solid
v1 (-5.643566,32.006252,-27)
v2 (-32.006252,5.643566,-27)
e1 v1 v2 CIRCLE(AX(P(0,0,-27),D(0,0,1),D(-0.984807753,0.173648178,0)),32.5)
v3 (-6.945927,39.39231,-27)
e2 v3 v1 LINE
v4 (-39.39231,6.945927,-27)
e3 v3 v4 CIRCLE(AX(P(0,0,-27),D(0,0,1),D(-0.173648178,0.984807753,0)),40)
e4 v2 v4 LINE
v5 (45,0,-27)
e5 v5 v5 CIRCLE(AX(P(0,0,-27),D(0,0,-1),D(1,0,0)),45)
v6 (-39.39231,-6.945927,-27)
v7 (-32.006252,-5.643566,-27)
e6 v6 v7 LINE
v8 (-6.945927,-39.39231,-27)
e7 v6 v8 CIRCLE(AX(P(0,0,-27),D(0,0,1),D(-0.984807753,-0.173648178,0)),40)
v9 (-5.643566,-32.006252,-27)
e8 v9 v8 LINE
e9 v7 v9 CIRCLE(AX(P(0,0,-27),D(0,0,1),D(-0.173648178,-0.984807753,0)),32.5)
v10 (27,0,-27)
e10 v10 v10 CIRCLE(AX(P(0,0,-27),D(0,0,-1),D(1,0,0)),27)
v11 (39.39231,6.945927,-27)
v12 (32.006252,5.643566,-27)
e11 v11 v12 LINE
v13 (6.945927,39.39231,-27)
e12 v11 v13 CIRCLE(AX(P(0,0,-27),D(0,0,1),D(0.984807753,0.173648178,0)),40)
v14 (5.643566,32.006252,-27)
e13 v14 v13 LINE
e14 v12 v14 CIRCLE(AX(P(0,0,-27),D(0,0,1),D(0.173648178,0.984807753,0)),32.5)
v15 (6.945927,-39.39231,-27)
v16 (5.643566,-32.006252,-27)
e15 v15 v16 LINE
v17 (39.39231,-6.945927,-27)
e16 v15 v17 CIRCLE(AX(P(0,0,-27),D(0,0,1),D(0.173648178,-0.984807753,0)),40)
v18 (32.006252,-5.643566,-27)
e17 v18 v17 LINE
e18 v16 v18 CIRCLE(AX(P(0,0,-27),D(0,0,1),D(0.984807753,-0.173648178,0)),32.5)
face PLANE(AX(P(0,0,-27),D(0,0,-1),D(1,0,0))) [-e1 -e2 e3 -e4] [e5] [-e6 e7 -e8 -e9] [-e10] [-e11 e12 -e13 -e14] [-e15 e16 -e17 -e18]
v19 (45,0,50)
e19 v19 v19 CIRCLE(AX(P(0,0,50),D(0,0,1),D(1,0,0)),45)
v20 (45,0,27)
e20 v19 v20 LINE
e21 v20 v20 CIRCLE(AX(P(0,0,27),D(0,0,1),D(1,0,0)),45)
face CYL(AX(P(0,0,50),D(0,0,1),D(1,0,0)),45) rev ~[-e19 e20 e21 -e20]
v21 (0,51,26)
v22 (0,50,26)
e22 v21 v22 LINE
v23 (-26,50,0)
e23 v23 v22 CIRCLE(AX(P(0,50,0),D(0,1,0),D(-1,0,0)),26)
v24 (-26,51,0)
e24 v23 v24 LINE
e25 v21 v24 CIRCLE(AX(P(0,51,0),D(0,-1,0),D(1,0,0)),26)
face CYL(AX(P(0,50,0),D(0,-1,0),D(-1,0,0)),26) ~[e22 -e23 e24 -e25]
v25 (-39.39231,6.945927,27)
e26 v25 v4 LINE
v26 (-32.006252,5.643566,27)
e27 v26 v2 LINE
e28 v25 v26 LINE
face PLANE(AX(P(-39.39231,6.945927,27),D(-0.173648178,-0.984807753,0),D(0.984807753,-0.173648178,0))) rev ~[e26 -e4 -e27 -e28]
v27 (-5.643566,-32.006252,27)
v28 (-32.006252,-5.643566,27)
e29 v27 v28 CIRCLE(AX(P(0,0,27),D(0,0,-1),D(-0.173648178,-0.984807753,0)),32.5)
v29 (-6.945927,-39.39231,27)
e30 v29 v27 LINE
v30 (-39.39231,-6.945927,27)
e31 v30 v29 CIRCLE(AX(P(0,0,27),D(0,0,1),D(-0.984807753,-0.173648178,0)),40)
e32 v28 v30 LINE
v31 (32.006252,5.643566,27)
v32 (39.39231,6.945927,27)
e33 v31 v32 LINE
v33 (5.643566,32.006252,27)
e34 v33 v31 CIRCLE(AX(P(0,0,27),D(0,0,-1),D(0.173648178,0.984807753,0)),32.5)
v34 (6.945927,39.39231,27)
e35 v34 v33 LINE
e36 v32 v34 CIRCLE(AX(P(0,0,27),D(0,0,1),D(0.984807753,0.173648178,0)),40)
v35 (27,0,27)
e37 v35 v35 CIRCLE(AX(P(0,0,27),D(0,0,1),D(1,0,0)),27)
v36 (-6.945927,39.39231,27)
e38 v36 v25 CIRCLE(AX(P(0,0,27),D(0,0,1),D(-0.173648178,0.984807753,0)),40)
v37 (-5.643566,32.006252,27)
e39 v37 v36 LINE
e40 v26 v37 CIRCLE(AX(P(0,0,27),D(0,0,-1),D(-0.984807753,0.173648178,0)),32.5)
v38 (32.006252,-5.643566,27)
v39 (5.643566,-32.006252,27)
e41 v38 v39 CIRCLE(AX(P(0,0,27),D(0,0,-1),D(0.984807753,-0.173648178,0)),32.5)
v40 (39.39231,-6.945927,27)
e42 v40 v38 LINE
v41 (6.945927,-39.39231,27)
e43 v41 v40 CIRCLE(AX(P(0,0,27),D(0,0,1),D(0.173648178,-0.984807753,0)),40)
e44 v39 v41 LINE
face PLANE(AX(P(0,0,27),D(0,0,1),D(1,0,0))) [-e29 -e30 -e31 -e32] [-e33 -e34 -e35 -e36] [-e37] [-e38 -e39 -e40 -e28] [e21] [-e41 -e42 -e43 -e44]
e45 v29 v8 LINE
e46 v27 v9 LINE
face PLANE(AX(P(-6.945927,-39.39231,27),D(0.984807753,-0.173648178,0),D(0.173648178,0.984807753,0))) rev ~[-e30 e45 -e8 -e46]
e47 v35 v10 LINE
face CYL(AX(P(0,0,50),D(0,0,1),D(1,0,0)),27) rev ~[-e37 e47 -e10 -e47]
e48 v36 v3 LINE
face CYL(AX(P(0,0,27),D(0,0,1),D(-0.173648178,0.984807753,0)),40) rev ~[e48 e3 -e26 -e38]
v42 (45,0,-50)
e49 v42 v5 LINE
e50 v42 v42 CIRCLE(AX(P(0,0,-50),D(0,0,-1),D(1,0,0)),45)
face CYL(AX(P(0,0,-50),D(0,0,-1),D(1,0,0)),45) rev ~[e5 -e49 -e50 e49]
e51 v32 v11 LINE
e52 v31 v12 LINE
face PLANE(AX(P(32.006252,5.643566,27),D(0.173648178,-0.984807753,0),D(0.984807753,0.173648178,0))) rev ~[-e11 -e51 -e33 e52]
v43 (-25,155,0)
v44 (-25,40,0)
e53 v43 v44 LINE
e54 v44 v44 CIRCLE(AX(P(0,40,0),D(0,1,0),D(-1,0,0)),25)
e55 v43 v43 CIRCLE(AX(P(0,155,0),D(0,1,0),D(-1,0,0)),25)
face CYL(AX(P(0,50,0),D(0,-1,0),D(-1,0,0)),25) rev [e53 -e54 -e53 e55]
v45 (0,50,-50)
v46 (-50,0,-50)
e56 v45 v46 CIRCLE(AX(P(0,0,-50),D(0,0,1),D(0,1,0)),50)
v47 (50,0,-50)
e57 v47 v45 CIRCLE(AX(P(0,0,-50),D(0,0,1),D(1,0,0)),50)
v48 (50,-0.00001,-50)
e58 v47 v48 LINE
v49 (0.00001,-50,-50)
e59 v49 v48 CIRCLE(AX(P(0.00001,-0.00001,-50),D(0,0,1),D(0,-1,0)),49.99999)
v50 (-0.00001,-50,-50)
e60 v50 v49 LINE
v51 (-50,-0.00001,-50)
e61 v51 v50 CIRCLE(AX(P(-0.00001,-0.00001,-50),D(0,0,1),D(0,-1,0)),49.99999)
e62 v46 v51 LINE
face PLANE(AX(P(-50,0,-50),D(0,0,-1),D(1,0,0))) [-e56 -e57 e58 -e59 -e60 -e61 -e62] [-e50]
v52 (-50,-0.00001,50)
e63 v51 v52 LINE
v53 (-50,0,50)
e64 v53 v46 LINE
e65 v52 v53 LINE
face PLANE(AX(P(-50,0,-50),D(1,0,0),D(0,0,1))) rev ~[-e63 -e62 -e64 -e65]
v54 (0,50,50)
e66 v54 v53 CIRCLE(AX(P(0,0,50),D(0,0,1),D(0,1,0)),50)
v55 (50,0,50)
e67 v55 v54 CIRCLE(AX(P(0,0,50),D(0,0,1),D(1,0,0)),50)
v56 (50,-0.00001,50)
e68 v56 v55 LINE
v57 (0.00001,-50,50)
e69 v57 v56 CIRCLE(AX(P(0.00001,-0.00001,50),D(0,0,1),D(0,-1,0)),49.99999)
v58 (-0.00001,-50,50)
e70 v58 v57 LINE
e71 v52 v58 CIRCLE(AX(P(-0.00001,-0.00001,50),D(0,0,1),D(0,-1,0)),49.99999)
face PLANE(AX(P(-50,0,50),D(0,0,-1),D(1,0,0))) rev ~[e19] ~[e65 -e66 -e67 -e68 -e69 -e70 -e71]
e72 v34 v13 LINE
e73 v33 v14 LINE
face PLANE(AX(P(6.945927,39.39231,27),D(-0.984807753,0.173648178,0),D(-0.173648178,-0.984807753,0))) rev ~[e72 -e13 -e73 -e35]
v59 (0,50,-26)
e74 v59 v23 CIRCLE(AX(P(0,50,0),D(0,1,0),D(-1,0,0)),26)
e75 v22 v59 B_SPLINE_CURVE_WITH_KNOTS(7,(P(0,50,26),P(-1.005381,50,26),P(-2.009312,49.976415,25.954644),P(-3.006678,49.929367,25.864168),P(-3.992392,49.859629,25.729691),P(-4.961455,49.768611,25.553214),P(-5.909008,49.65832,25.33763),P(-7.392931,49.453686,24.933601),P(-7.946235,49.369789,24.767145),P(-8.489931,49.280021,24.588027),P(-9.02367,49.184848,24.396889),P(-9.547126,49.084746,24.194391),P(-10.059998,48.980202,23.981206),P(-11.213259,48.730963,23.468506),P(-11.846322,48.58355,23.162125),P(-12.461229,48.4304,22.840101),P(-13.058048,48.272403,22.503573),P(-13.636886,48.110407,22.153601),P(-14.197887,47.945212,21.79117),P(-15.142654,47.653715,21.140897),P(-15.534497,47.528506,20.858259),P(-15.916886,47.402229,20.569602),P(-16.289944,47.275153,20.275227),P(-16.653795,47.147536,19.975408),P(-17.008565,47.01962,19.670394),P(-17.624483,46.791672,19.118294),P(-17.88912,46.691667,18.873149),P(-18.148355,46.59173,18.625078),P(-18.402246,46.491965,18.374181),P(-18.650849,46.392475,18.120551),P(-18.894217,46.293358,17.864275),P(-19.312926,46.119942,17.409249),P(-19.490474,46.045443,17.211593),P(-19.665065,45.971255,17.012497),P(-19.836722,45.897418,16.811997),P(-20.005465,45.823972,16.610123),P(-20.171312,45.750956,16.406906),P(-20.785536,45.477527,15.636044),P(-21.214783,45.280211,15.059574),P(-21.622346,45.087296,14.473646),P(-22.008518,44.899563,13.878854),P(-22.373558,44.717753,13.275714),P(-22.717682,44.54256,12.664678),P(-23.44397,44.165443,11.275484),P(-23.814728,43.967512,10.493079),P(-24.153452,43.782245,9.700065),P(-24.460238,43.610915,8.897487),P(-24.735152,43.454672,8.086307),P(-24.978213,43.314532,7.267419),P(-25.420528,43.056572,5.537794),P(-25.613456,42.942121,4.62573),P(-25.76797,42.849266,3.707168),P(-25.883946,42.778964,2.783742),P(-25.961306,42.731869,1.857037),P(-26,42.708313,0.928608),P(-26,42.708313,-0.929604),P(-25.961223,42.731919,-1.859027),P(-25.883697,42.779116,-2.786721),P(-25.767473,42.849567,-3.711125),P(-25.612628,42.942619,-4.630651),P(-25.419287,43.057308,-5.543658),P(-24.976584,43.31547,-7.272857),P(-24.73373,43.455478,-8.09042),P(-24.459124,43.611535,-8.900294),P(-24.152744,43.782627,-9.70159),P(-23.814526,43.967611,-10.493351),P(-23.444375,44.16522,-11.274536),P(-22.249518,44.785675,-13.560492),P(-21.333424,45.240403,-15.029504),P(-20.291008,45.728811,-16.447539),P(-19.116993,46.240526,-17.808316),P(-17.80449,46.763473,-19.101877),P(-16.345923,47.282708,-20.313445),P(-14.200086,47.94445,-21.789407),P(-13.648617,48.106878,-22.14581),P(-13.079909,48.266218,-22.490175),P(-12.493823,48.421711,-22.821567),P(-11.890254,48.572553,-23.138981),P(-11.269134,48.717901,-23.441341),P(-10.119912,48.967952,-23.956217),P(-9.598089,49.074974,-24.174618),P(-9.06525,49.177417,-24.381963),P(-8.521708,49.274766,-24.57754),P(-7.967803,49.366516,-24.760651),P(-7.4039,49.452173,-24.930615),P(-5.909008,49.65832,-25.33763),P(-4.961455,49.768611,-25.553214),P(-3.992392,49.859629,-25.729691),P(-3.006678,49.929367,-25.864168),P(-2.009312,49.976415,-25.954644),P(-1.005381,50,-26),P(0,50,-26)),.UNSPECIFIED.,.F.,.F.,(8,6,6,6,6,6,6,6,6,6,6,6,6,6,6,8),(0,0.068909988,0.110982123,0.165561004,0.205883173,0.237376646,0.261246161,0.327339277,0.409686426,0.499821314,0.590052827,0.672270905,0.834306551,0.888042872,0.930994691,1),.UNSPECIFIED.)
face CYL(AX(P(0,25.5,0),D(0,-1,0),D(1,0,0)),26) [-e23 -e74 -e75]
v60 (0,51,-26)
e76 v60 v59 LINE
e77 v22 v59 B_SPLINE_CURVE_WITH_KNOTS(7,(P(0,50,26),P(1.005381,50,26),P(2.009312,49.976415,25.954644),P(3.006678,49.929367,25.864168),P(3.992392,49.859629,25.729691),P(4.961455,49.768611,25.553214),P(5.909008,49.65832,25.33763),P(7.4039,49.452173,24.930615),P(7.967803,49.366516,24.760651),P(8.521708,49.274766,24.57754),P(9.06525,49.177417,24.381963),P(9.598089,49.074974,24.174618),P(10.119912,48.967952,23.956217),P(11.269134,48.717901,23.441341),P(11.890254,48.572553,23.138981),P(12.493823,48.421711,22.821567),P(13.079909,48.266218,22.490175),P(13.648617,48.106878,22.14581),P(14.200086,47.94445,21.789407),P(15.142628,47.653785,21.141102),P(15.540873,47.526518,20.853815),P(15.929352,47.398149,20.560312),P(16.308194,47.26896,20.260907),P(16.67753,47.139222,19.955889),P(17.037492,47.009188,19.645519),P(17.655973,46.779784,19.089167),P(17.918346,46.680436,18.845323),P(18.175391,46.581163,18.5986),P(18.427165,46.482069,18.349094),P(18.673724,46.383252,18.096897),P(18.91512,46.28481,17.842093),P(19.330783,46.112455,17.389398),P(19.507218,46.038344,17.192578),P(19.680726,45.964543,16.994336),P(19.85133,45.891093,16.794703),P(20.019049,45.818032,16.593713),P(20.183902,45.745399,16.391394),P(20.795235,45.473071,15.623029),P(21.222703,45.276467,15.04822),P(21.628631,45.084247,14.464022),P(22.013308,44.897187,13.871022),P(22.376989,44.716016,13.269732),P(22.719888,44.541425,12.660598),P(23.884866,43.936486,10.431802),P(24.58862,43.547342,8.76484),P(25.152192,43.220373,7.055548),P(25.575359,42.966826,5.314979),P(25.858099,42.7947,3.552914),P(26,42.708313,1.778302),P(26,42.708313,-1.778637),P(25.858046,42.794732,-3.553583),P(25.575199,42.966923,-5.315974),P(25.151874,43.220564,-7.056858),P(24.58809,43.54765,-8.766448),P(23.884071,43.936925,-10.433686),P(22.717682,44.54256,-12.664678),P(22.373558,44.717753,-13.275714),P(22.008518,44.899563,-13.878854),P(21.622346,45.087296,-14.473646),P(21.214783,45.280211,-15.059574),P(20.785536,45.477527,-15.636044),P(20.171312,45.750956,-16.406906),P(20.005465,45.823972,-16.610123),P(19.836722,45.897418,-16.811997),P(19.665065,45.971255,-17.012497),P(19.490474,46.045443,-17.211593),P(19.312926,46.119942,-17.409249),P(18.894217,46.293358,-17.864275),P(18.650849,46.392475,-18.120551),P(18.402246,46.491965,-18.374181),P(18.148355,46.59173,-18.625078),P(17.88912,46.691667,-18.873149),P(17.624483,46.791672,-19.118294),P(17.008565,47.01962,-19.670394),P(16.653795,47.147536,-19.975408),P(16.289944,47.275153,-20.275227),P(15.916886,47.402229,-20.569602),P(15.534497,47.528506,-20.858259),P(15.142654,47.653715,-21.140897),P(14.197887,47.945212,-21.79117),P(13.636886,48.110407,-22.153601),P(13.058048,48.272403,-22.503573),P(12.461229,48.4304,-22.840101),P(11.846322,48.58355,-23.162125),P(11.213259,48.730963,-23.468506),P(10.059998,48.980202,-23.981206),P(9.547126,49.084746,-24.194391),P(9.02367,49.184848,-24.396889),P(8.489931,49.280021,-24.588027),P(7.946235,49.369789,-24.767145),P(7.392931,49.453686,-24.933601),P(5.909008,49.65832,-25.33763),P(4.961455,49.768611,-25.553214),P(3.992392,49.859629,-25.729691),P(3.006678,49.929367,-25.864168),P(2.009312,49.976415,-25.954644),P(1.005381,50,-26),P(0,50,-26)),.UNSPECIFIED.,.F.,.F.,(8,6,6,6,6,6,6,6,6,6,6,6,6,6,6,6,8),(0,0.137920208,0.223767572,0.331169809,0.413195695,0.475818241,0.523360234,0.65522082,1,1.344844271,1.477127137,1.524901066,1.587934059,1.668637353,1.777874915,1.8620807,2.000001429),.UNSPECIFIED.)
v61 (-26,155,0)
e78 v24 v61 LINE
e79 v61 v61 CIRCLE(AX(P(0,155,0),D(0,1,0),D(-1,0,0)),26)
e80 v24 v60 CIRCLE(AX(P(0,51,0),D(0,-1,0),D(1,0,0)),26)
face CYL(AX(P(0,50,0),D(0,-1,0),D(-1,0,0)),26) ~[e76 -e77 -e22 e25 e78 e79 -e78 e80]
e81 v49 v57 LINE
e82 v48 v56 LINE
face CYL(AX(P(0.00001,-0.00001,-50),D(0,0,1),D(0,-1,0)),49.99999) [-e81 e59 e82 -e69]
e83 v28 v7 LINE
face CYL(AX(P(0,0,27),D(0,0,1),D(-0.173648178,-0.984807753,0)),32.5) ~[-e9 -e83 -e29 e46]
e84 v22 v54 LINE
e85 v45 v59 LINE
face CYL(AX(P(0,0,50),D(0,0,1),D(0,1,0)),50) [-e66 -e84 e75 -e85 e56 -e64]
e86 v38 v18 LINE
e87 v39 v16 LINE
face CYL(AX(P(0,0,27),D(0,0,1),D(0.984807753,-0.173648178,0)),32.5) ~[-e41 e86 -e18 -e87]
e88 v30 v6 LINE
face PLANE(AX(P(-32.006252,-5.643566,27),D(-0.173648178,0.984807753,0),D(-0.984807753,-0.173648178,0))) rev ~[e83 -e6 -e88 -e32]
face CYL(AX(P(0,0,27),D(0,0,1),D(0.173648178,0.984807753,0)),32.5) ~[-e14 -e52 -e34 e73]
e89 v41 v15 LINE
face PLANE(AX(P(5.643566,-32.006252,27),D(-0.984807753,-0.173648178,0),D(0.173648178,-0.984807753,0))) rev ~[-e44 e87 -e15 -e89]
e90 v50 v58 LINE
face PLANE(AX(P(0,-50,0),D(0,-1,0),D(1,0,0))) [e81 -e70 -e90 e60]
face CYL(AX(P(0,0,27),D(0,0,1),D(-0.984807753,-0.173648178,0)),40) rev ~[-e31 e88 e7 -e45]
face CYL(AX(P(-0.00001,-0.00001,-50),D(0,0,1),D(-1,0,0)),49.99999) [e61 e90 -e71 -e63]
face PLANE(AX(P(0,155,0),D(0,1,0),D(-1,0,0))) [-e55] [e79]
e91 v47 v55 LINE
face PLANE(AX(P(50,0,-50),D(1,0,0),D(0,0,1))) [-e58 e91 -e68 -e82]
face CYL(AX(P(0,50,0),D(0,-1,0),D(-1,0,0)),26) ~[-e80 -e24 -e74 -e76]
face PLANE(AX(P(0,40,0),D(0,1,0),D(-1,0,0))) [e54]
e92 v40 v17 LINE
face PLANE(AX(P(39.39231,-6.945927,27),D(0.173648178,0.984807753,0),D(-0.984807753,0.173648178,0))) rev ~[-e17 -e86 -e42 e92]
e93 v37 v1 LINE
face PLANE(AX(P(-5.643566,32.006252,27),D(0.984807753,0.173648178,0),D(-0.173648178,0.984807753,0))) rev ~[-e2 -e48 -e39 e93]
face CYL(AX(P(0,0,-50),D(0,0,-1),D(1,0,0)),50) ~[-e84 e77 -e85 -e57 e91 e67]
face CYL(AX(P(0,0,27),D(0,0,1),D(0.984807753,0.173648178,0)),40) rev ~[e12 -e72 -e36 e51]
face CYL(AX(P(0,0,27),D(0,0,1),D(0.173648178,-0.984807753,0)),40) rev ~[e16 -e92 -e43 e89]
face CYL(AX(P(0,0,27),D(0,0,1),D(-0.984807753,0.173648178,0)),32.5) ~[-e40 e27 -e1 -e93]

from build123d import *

# Parameters (mm, degrees)
F0_W          = 100
F0_H          = 100
F1_DEPTH      = 50
F2_R          = 27
F3_DEPTH      = 100.001
F4_R          = 45
F5_DEPTH      = 23
F6_R          = 45
F6_R_2        = 27
F7_DEPTH      = 23
F8_R          = 49.99999
F9_R          = 25
F10_DEPTH     = 10
F11_R         = 26
F11_R_2       = 25
F12_DEPTH     = 105
F13_T4_DEPTH  = 100
F13_S5_R      = 26
F13_T6_DEPTH  = 63
F13_T10_DEPTH = 100
F13_S11_R     = 26
F13_T12_DEPTH = 63
F15_DEPTH     = 77.0010001


# Not quite as in the source:
# - a fillet or chamfer that OpenCascade refuses, or shapes differently, is made with other operations: its cross-section is extruded or revolved along the edge and cut away or added
# - a fillet or chamfer is up to 0.001 mm smaller than in the source, because OpenCascade refuses the exact size


with BuildPart() as f1:
    # F0 (on Front) → F1 (new body, symmetric)
    with BuildSketch(Plane.XZ):
        Rectangle(F0_W, F0_H)
    extrude(amount=F1_DEPTH, both=True)

    # F2 (on face) → F3 (cut, through all)
    with BuildSketch(Plane.XY.offset(50)):
        Circle(F2_R)
    extrude(amount=-F3_DEPTH, mode=Mode.SUBTRACT)

    # F4 (on face) → F5 (cut)
    with BuildSketch(Plane.XY.offset(50)):
        Circle(F4_R)
    extrude(amount=-F5_DEPTH, mode=Mode.SUBTRACT)

    # F6 (on face) → F7 (cut)
    with BuildSketch(Plane(origin=(0, 0, -50), x_dir=(1, 0, 0), z_dir=(0, 0, -1))):
        Circle(F6_R)
        Circle(F6_R_2, mode=Mode.SUBTRACT)
    extrude(amount=-F7_DEPTH, mode=Mode.SUBTRACT)

    # F8 (radius 50 in the source; OpenCascade refuses exactly that, so slightly less here)
    f8_edges = [f1.edges().sort_by_distance(p)[0] for p in [
        (50, -50, 0),
        (-50, -50, 0),
    ]]
    fillet(f8_edges, radius=F8_R)

    # F9 (on face) → F10 (cut)
    with BuildSketch(Plane(origin=(0, 50, 0), x_dir=(-1, 0, 0), z_dir=(0, 1, 0))):
        Circle(F9_R)
    extrude(amount=-F10_DEPTH, mode=Mode.SUBTRACT)

    # F11 (on face) → F12 (join)
    with BuildSketch(Plane(origin=(0, 50, 0), x_dir=(-1, 0, 0), z_dir=(0, 1, 0))):
        Circle(F11_R)
        Circle(F11_R_2, mode=Mode.SUBTRACT)
    extrude(amount=F12_DEPTH)

    # F13: fillet of radius 50 on 2 edges, made by hand


with BuildPart() as f13_tool2:
    # F13_s3 → F13_t4 (new body)
    with BuildSketch(Plane.XY.offset(-50)):
        with BuildLine():
            ThreePointArc((50, 0), (35.3553390593, 35.3553390593), (0, 50))
            Line((0, 50), (0, 51))
            Line((0, 51), (51, 51))
            Line((51, 51), (51, 0))
            Line((51, 0), (50, 0))
        make_face()
    extrude(amount=F13_T4_DEPTH)

    # F13_s5 → F13_t6 (cut, symmetric)
    with BuildSketch(Plane.XZ.offset(-25.5)):
        Circle(F13_S5_R)
    extrude(amount=F13_T6_DEPTH, both=True, mode=Mode.SUBTRACT)


with BuildPart() as f1_1:
    add(f1.part)

    # F13_t1: cut F13_tool2
    add(f13_tool2.part, mode=Mode.SUBTRACT)


with BuildPart() as f13_tool8:
    # F13_s9 → F13_t10 (new body)
    with BuildSketch(Plane.XY.offset(50)):
        with BuildLine():
            ThreePointArc((0, 50), (-35.3553390593, 35.3553390593), (-50, 0))
            Line((-50, 0), (-51, 0))
            Line((-51, 0), (-51, 51))
            Line((-51, 51), (0, 51))
            Line((0, 51), (0, 50))
        make_face()
    extrude(amount=-F13_T10_DEPTH)

    # F13_s11 → F13_t12 (cut, symmetric)
    with BuildSketch(Plane.XZ.offset(-25.5)):
        Circle(F13_S11_R)
    extrude(amount=F13_T12_DEPTH, both=True, mode=Mode.SUBTRACT)


with BuildPart() as f1_2:
    add(f1_1.part)

    # F13_t7: cut F13_tool8
    add(f13_tool8.part, mode=Mode.SUBTRACT)

    # F14 (on face) → F15 (cut, through all)
    with BuildSketch(Plane.XY.offset(27)):
        with BuildLine():
            ThreePointArc((-32.0062519729, 5.6435657742), (-22.9809703886, 22.9809703886), (-5.6435657742, 32.0062519729))
            Line((-5.6435657742, 32.0062519729), (-6.9459271067, 39.3923101205))
            ThreePointArc((-6.9459271067, 39.3923101205), (-28.2842712475, 28.2842712475), (-39.3923101205, 6.9459271067))
            Line((-39.3923101205, 6.9459271067), (-32.0062519729, 5.6435657742))
        make_face()
        with BuildLine():
            ThreePointArc((5.6435657742, 32.0062519729), (22.9809703886, 22.9809703886), (32.0062519729, 5.6435657742))
            Line((32.0062519729, 5.6435657742), (39.3923101205, 6.9459271067))
            ThreePointArc((39.3923101205, 6.9459271067), (28.2842712475, 28.2842712475), (6.9459271067, 39.3923101205))
            Line((6.9459271067, 39.3923101205), (5.6435657742, 32.0062519729))
        make_face()
        with BuildLine():
            Line((39.3923101205, -6.9459271067), (32.0062519729, -5.6435657742))
            ThreePointArc((32.0062519729, -5.6435657742), (22.9809703886, -22.9809703886), (5.6435657742, -32.0062519729))
            Line((5.6435657742, -32.0062519729), (6.9459271067, -39.3923101205))
            ThreePointArc((6.9459271067, -39.3923101205), (28.2842712475, -28.2842712475), (39.3923101205, -6.9459271067))
        make_face()
        with BuildLine():
            Line((-6.9459271067, -39.3923101205), (-5.6435657742, -32.0062519729))
            ThreePointArc((-5.6435657742, -32.0062519729), (-22.9809703886, -22.9809703886), (-32.0062519729, -5.6435657742))
            Line((-32.0062519729, -5.6435657742), (-39.3923101205, -6.9459271067))
            ThreePointArc((-39.3923101205, -6.9459271067), (-28.2842712475, -28.2842712475), (-6.9459271067, -39.3923101205))
        make_face()
    extrude(amount=-F15_DEPTH, mode=Mode.SUBTRACT)


solid = f1_2.part
